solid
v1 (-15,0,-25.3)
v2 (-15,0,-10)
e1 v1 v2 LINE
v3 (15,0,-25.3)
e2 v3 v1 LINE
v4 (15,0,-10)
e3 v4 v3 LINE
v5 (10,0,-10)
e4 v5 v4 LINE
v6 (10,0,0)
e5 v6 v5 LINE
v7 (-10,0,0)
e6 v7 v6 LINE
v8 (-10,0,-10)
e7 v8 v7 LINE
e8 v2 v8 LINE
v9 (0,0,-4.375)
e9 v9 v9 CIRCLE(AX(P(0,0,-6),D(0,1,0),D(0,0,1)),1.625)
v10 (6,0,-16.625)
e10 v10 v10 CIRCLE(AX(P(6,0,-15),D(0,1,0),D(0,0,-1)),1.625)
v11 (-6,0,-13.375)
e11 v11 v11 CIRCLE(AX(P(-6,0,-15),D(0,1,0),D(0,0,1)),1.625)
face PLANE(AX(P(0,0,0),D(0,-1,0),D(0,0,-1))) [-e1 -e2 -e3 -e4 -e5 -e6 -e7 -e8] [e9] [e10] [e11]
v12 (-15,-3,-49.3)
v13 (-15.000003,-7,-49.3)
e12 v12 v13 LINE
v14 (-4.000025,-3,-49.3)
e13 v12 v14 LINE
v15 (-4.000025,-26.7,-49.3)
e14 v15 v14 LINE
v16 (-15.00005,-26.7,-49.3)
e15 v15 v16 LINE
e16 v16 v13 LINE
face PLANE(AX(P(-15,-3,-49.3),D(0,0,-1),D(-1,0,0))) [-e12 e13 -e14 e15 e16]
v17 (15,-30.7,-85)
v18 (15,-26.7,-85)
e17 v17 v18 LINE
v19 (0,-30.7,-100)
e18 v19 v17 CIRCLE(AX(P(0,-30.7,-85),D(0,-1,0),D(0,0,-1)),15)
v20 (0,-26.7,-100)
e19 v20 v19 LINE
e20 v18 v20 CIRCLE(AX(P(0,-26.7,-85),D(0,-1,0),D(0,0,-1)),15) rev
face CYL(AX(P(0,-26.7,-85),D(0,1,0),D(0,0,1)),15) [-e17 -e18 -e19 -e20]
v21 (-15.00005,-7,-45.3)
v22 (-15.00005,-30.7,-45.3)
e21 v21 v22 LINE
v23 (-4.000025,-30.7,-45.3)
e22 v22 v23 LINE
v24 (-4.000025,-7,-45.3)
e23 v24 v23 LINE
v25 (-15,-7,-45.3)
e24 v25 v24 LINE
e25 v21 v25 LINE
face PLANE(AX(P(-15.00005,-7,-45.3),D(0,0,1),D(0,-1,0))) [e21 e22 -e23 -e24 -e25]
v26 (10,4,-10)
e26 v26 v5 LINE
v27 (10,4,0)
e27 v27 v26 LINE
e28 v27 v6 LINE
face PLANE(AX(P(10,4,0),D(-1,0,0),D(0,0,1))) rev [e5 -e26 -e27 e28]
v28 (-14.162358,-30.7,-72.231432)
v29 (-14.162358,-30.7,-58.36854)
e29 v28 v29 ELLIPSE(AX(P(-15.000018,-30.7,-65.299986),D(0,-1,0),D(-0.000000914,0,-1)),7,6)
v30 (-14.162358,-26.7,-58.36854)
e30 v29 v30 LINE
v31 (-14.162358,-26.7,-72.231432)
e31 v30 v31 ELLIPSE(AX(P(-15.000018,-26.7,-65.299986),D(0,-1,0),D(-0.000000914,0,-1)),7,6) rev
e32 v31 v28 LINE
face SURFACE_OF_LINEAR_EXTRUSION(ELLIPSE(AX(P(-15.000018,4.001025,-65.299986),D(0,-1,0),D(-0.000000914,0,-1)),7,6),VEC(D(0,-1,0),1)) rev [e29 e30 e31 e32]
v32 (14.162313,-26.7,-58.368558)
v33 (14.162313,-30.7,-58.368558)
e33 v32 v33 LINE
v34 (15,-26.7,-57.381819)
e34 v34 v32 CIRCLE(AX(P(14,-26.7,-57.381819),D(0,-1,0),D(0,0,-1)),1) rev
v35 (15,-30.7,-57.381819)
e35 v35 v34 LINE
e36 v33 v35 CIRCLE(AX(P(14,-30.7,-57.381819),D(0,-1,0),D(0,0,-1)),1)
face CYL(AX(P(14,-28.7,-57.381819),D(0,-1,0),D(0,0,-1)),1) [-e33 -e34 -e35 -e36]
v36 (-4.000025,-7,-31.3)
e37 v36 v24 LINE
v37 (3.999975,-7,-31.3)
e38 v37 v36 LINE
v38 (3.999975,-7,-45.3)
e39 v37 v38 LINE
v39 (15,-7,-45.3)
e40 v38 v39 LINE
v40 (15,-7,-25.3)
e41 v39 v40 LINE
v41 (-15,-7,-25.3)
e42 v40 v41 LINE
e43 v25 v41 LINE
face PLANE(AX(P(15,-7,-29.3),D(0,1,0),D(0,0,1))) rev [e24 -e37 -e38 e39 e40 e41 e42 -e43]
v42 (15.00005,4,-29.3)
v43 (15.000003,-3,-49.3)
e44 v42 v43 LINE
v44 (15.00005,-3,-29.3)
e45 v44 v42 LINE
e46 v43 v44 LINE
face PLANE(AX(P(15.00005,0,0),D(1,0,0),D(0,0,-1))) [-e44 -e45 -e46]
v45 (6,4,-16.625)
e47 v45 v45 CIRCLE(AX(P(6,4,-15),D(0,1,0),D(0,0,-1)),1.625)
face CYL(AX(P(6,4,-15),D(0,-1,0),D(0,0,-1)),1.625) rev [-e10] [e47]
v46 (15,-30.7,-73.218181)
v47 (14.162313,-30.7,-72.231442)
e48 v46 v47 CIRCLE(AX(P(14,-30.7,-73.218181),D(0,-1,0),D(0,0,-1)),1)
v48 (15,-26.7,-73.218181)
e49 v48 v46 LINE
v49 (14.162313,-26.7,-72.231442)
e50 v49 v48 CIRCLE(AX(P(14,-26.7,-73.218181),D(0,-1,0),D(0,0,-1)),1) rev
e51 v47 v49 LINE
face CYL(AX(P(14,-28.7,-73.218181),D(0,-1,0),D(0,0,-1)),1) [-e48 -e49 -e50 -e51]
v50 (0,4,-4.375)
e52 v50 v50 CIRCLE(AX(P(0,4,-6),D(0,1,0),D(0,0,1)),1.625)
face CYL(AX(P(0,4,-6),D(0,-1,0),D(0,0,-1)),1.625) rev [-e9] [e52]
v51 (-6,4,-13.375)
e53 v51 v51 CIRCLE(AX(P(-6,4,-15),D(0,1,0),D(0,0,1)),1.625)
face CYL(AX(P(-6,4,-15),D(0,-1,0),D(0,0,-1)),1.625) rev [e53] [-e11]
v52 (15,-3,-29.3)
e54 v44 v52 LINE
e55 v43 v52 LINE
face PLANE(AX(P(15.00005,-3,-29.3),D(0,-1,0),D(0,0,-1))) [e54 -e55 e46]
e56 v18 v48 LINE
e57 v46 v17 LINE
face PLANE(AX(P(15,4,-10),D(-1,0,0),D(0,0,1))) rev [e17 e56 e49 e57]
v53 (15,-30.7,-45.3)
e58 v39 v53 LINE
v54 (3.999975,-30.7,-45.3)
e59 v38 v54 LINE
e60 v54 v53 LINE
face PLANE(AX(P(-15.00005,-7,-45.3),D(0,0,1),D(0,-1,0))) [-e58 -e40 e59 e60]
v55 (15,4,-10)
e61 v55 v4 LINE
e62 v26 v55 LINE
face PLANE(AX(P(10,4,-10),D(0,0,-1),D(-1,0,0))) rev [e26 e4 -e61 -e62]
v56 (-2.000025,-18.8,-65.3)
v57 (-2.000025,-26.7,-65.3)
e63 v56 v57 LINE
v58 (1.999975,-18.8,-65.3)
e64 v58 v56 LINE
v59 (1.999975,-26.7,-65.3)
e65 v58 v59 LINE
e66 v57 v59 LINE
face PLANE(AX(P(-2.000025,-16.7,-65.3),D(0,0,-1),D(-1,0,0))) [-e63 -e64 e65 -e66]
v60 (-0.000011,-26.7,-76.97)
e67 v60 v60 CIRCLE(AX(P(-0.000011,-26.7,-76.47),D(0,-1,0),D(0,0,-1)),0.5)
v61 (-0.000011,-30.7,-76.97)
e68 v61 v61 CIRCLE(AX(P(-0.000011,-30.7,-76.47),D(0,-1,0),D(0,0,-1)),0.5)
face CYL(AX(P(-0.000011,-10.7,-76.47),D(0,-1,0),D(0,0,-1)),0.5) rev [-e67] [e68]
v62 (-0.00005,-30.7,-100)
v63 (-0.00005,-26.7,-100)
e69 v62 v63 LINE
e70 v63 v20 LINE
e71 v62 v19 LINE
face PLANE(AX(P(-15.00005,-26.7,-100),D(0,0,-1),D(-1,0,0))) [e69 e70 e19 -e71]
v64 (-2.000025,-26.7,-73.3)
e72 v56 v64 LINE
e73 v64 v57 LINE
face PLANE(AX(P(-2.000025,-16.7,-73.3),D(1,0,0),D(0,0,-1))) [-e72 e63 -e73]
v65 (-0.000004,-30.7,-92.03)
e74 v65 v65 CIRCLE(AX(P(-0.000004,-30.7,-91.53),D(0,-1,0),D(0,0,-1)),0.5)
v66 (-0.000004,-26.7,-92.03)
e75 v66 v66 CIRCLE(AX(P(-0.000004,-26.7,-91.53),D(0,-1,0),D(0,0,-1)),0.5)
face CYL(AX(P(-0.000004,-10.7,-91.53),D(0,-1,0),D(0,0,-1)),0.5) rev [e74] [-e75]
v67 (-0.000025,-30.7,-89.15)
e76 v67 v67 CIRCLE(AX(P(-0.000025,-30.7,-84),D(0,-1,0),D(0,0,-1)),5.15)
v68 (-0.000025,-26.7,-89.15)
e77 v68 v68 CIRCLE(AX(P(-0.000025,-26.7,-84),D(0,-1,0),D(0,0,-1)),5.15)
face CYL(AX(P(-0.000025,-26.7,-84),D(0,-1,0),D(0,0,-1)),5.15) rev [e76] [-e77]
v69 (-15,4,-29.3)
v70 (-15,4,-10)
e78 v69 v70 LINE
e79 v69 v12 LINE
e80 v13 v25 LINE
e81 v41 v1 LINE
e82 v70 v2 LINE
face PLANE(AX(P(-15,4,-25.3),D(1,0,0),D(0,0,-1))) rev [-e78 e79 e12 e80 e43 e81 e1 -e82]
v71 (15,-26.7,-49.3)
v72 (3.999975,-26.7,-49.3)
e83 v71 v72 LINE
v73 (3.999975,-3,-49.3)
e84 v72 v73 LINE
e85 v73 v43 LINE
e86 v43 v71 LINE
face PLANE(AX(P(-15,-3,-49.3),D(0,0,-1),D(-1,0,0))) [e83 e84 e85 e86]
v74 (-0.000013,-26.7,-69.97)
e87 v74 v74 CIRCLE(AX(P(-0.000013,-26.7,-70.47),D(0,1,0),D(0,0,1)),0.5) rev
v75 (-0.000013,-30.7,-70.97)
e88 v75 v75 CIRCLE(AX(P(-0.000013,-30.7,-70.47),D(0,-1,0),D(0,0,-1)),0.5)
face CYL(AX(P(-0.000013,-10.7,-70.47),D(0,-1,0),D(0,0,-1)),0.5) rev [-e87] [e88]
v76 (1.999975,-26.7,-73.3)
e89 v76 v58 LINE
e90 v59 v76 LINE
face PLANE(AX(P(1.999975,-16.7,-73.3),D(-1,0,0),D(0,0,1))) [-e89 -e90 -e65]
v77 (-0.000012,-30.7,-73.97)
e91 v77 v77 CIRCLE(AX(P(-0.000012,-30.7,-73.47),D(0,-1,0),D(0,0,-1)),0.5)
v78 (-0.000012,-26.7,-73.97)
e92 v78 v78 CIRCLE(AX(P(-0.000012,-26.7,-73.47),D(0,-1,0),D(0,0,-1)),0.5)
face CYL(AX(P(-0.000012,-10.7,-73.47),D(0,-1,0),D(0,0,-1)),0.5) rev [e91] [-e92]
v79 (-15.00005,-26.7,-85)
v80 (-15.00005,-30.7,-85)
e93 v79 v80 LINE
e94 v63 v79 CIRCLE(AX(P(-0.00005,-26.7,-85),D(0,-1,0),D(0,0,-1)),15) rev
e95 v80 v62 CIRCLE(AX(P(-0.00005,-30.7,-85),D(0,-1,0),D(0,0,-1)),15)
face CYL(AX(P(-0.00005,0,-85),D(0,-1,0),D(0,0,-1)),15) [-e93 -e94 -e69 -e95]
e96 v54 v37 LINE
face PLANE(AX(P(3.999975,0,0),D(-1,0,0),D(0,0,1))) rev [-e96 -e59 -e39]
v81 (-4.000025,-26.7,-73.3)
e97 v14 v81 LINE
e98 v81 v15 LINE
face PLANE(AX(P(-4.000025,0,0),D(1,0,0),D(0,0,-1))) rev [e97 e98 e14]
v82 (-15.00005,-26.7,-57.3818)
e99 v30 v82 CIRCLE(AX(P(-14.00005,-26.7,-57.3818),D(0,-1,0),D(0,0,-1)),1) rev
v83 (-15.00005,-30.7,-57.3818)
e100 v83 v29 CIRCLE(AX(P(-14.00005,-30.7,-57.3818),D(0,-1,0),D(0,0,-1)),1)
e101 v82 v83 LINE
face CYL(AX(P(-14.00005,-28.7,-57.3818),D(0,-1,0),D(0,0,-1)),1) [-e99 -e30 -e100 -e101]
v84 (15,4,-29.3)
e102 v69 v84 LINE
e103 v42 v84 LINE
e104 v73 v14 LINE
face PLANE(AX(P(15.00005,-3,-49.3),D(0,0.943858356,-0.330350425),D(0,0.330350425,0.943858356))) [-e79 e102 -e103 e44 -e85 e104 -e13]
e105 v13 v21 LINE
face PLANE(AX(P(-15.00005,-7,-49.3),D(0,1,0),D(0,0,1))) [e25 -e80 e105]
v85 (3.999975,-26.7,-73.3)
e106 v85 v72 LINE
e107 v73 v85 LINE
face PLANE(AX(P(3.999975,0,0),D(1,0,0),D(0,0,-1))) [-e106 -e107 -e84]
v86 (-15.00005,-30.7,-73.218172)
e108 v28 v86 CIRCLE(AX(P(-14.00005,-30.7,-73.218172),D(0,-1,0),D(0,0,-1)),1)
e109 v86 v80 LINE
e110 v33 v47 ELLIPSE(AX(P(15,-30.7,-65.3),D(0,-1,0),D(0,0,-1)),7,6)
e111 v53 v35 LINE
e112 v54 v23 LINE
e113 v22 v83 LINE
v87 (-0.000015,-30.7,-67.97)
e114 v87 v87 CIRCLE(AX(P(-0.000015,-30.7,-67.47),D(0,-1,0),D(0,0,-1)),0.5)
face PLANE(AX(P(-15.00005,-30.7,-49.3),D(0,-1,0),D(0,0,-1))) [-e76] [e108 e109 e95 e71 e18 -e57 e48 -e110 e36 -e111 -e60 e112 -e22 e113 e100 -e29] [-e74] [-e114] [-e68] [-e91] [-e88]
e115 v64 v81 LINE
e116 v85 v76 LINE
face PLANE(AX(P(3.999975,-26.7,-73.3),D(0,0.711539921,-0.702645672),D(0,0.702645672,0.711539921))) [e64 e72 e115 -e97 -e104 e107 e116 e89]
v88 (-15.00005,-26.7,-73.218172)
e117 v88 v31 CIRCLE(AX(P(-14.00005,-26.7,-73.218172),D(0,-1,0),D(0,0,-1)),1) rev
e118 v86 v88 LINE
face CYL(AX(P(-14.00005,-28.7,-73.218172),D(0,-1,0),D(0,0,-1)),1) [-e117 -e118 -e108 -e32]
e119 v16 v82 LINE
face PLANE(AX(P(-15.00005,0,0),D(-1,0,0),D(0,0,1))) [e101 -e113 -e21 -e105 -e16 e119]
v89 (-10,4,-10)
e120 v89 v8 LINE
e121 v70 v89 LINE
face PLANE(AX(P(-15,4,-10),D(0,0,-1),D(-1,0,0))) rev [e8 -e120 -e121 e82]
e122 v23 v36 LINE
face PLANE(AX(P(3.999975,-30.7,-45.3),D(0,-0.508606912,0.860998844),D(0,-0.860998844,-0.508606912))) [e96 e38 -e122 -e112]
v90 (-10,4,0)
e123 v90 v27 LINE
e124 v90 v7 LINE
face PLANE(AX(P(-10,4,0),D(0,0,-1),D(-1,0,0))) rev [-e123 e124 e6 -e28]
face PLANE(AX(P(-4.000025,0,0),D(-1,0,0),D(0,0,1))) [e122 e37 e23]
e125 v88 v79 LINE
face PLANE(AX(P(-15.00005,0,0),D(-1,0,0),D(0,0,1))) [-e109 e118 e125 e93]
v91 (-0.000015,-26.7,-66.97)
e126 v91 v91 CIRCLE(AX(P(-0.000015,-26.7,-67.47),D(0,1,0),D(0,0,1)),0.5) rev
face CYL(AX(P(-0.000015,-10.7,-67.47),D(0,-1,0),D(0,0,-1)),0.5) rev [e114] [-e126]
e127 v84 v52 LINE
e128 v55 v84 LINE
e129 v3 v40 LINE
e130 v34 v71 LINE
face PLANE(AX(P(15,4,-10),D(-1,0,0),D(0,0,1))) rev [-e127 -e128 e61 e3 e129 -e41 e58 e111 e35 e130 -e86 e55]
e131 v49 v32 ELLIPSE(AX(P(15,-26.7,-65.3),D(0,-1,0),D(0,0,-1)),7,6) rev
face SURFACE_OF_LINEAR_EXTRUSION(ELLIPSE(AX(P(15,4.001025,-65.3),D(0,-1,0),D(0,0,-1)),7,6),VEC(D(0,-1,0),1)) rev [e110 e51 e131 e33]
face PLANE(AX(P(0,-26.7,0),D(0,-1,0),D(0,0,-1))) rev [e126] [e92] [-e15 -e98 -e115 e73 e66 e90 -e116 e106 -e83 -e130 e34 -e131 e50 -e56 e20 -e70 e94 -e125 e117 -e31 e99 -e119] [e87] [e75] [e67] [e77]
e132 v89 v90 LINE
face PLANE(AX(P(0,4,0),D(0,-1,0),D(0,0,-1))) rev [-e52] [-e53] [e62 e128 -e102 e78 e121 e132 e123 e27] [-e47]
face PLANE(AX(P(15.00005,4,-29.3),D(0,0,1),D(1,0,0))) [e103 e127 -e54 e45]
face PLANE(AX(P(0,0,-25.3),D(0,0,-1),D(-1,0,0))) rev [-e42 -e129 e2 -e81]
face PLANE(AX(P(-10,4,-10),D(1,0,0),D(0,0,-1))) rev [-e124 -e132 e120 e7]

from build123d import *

# Parameters (mm, degrees)
SKETCH_1_R           = 1.625
EXTRUDE_1_DEPTH      = 4
SKETCH_2_W           = 30
SKETCH_2_H           = 11
EXTRUDE_2_DEPTH      = 4
SKETCH_3_W           = 30
SKETCH_3_H           = 24
EXTRUDE_3_DEPTH      = 4
EXTRUDE_4_DEPTH      = 30
SKETCH_5_W           = 4
SKETCH_5_H           = 23.7
EXTRUDE_5_DEPTH      = 30
SKETCH_6_W           = 30.00005
SKETCH_6_H           = 54.7
SKETCH_6_R           = 5.15
EXTRUDE_6_DEPTH      = 4
CUT_EXTRUDE_1_REACH  = 108.907
SKETCH_8_RX          = 7
SKETCH_8_RY          = 6
FILLET_START         = -32
FILLET_2_DEPTH       = 6
FILLET_3_R           = 15
EXTRUDE_8_DEPTH      = 4
EXTRUDE_8_DEPTH_BACK = 4
EXTRUDE_9_DEPTH      = 4
EXTRUDE_9_DEPTH_BACK = 4
SKETCH_13_R          = 0.5
CUT_EXTRUDE_2_DEPTH  = 20
SKETCH_14_W          = 4
SKETCH_14_H          = 8
CUT_EXTRUDE_3_DEPTH  = 10


with BuildPart() as part:
    # Эскиз1 → Бобышка-Вытянуть1 (new body)
    with BuildSketch(Plane(origin=(0, 0, 0), x_dir=(1, 0, 0), z_dir=(0, 1, 0))):
        Polygon((-10, 0), (10, 0), (10, 10), (15, 10), (15, 25.3), (-15, 25.3), (-15, 10), (-10, 10), align=None)
        with Locations(Location((-6, 15, 0), (0, 0, 270))):
            Circle(SKETCH_1_R, mode=Mode.SUBTRACT)
        with Locations(Location((0, 6, 0), (0, 0, 270))):
            Circle(SKETCH_1_R, mode=Mode.SUBTRACT)
        with Locations(Location((6, 15, 0), (0, 0, 90))):
            Circle(SKETCH_1_R, mode=Mode.SUBTRACT)
    extrude(amount=EXTRUDE_1_DEPTH)

    # Эскиз2 → Бобышка-Вытянуть2 (add)
    with BuildSketch(Plane(origin=(0, 0, -25.3), x_dir=(-1, 0, 0), z_dir=(0, 0, -1))):
        with Locations((0, -1.5)):
            Rectangle(SKETCH_2_W, SKETCH_2_H)
    extrude(amount=EXTRUDE_2_DEPTH)

    # Эскиз3 → Бобышка-Вытянуть3 (add)
    with BuildSketch(Plane.XZ.offset(7)):
        with Locations((0, -37.3)):
            Rectangle(SKETCH_3_W, SKETCH_3_H)
    extrude(amount=-EXTRUDE_3_DEPTH)

    # Эскиз4 → Бобышка-Вытянуть4 (add, through all)
    with BuildSketch(Plane.ZY.offset(15)):
        Polygon((-29.3, 4), (-29.3, -3), (-49.3, -3), align=None)
    extrude(amount=-EXTRUDE_4_DEPTH)

    # Эскиз5 → Бобышка-Вытянуть5 (add, through all)
    with BuildSketch(Plane(origin=(15, 0, 0), x_dir=(0, 0, -1), z_dir=(1, 0, 0))):
        with Locations((47.3, -18.85)):
            Rectangle(SKETCH_5_W, SKETCH_5_H)
    extrude(amount=-EXTRUDE_5_DEPTH)

    # Эскиз6 → Бобышка-Вытянуть6 (add)
    with BuildSketch(Plane.XZ.offset(30.7)):
        with Locations((-2.5e-05, -72.65)):
            Rectangle(SKETCH_6_W, SKETCH_6_H)
        with Locations(Location((-2.5e-05, -84, 0), (0, 0, 270))):
            Circle(SKETCH_6_R, mode=Mode.SUBTRACT)
    extrude(amount=-EXTRUDE_6_DEPTH)

    # Эскиз8 → Вырез-Вытянуть1 (cut, up to next)
    with BuildSketch(Plane.XZ.offset(30.7), mode=Mode.PRIVATE) as cut_extrude_1_sk1:
        with Locations(Location((15, -65.3), (0, 0, -90))):
            Ellipse(SKETCH_8_RX, SKETCH_8_RY)
    cut_extrude_1_tool1 = extrude(cut_extrude_1_sk1.sketch, amount=-CUT_EXTRUDE_1_REACH, mode=Mode.PRIVATE) & part.part
    # Эскиз8 → Вырез-Вытянуть1 (cut, up to next)
    with BuildSketch(Plane.XZ.offset(30.7), mode=Mode.PRIVATE) as cut_extrude_1_sk2:
        with Locations(Location((-15.000018282, -65.299986289), (0, 0, -90.000052373))):
            Ellipse(SKETCH_8_RX, SKETCH_8_RY)
    cut_extrude_1_tool2 = extrude(cut_extrude_1_sk2.sketch, amount=-CUT_EXTRUDE_1_REACH, mode=Mode.PRIVATE) & part.part
    add(cut_extrude_1_tool1.solids().sort_by_distance((15, -30.7, -65.3))[0], mode=Mode.SUBTRACT)
    add(cut_extrude_1_tool2.solids().sort_by_distance((-15.000018, -30.7, -65.299986))[0], mode=Mode.SUBTRACT)

    # Скругление2: read off the stored shape, not the designer's step
    # Скругление2 outline → Скругление2 (cut)
    with BuildSketch(Plane(origin=(0, 0, 0), x_dir=(1, 0, 0), z_dir=(0, 1, 0)).offset(FILLET_START)):
        with BuildLine():
            Line((15, 72.3), (15, 73.218180859))
            ThreePointArc((15, 73.218180859), (14.762336304, 72.570999772), (14.162313281, 72.231441583))
            add(Edge.make_bspline(
                [(14.162313281, 72.231441583), (14.579095458, 72.3), (15, 72.3)],
                knots=[6.131749827, 6.131749827, 6.131749827, 6.283185307, 6.283185307, 6.283185307], degree=2, weights=[0.948970652, 0.971763096, 1]))
        make_face()
        with BuildLine():
            add(Edge.make_bspline(
                [(15, 58.3), (14.579095458, 58.3), (14.162313281, 58.368558417)],
                knots=[3.141592654, 3.141592654, 3.141592654, 3.293028134, 3.293028134, 3.293028134], degree=2, weights=[1, 0.971763096, 0.948970652]))
            ThreePointArc((14.162313281, 58.368558417), (14.762336304, 58.029000228), (15, 57.381819141))
            Line((15, 57.381819141), (15, 58.3))
        make_face()
        with BuildLine():
            add(Edge.make_bspline(
                [(-15.00005, 72.299986289), (-14.579143154, 72.299988746), (-14.162358429, 72.231432015)],
                knots=[6.283181087, 6.283181087, 6.283181087, 6.434617466, 6.434617466, 6.434617466], degree=2, weights=[1, 0.971762843, 0.948970209]))
            ThreePointArc((-14.162358429, 72.231432015), (-14.762384713, 72.570989127), (-15.00005, 73.218172089))
            Line((-15.00005, 73.218172089), (-15.00005, 72.299986289))
        make_face()
        with BuildLine():
            ThreePointArc((-15.00005, 57.381799936), (-14.762384538, 58.028983103), (-14.162357897, 58.368540098))
            add(Edge.make_bspline(
                [(-14.162357897, 58.368540098), (-14.579142884, 58.299983554), (-15.00005, 58.299986289)],
                knots=[9.27334784, 9.27334784, 9.27334784, 9.424784314, 9.424784314, 9.424784314], degree=2, weights=[0.948970181, 0.971762826, 1]))
            Line((-15.00005, 58.299986289), (-15.00005, 57.381799936))
        make_face()
    extrude(amount=FILLET_2_DEPTH, mode=Mode.SUBTRACT)

    # Скругление3
    fillet_3_edges = [part.edges().sort_by_distance(p)[0] for p in [
        (-15.00005, -28.7, -100),
        (15, -28.7, -100),
    ]]
    fillet(fillet_3_edges, radius=FILLET_3_R)

    # Эскиз10 → Бобышка-Вытянуть8 (add, two sides: drawn at the far end of the back side and taken through both)
    with BuildSketch(Plane.ZY.offset(2.5e-05).offset(-EXTRUDE_8_DEPTH_BACK)):
        Polygon((-49.3, -26.7), (-73.3, -26.7), (-49.3, -3), align=None)
    extrude(amount=EXTRUDE_8_DEPTH + EXTRUDE_8_DEPTH_BACK)

    # Эскиз11 → Бобышка-Вытянуть9 (add, two sides: drawn at the far end of the back side and taken through both)
    with BuildSketch(Plane.ZY.offset(2.5e-05).offset(-EXTRUDE_9_DEPTH_BACK)):
        Polygon((-31.3, -7), (-45.3, -7), (-45.3, -30.7), align=None)
    extrude(amount=EXTRUDE_9_DEPTH + EXTRUDE_9_DEPTH_BACK)

    # Эскиз13 → Вырез-Вытянуть2 (cut)
    with BuildSketch(Plane.XZ.offset(30.7)):
        with Locations(Location((-1.0754e-05, -76.47, 0), (0, 0, 270))):
            Circle(SKETCH_13_R)
        with Locations(Location((-1.2125e-05, -73.47, 0), (0, 0, 270))):
            Circle(SKETCH_13_R)
        with Locations(Location((-1.3496e-05, -70.47, 0), (0, 0, 270))):
            Circle(SKETCH_13_R)
        with Locations(Location((-1.4867e-05, -67.47, 0), (0, 0, 270))):
            Circle(SKETCH_13_R)
        with Locations(Location((-3.871e-06, -91.53, 0), (0, 0, 270))):
            Circle(SKETCH_13_R)
    extrude(amount=-CUT_EXTRUDE_2_DEPTH, mode=Mode.SUBTRACT)

    # Эскиз14 → Вырез-Вытянуть3 (cut)
    with BuildSketch(Plane(origin=(0, -26.7, 0), x_dir=(1, 0, 0), z_dir=(0, 1, 0))):
        with Locations((-2.5e-05, 69.3)):
            Rectangle(SKETCH_14_W, SKETCH_14_H)
    extrude(amount=CUT_EXTRUDE_3_DEPTH, mode=Mode.SUBTRACT)


solid = part.part
